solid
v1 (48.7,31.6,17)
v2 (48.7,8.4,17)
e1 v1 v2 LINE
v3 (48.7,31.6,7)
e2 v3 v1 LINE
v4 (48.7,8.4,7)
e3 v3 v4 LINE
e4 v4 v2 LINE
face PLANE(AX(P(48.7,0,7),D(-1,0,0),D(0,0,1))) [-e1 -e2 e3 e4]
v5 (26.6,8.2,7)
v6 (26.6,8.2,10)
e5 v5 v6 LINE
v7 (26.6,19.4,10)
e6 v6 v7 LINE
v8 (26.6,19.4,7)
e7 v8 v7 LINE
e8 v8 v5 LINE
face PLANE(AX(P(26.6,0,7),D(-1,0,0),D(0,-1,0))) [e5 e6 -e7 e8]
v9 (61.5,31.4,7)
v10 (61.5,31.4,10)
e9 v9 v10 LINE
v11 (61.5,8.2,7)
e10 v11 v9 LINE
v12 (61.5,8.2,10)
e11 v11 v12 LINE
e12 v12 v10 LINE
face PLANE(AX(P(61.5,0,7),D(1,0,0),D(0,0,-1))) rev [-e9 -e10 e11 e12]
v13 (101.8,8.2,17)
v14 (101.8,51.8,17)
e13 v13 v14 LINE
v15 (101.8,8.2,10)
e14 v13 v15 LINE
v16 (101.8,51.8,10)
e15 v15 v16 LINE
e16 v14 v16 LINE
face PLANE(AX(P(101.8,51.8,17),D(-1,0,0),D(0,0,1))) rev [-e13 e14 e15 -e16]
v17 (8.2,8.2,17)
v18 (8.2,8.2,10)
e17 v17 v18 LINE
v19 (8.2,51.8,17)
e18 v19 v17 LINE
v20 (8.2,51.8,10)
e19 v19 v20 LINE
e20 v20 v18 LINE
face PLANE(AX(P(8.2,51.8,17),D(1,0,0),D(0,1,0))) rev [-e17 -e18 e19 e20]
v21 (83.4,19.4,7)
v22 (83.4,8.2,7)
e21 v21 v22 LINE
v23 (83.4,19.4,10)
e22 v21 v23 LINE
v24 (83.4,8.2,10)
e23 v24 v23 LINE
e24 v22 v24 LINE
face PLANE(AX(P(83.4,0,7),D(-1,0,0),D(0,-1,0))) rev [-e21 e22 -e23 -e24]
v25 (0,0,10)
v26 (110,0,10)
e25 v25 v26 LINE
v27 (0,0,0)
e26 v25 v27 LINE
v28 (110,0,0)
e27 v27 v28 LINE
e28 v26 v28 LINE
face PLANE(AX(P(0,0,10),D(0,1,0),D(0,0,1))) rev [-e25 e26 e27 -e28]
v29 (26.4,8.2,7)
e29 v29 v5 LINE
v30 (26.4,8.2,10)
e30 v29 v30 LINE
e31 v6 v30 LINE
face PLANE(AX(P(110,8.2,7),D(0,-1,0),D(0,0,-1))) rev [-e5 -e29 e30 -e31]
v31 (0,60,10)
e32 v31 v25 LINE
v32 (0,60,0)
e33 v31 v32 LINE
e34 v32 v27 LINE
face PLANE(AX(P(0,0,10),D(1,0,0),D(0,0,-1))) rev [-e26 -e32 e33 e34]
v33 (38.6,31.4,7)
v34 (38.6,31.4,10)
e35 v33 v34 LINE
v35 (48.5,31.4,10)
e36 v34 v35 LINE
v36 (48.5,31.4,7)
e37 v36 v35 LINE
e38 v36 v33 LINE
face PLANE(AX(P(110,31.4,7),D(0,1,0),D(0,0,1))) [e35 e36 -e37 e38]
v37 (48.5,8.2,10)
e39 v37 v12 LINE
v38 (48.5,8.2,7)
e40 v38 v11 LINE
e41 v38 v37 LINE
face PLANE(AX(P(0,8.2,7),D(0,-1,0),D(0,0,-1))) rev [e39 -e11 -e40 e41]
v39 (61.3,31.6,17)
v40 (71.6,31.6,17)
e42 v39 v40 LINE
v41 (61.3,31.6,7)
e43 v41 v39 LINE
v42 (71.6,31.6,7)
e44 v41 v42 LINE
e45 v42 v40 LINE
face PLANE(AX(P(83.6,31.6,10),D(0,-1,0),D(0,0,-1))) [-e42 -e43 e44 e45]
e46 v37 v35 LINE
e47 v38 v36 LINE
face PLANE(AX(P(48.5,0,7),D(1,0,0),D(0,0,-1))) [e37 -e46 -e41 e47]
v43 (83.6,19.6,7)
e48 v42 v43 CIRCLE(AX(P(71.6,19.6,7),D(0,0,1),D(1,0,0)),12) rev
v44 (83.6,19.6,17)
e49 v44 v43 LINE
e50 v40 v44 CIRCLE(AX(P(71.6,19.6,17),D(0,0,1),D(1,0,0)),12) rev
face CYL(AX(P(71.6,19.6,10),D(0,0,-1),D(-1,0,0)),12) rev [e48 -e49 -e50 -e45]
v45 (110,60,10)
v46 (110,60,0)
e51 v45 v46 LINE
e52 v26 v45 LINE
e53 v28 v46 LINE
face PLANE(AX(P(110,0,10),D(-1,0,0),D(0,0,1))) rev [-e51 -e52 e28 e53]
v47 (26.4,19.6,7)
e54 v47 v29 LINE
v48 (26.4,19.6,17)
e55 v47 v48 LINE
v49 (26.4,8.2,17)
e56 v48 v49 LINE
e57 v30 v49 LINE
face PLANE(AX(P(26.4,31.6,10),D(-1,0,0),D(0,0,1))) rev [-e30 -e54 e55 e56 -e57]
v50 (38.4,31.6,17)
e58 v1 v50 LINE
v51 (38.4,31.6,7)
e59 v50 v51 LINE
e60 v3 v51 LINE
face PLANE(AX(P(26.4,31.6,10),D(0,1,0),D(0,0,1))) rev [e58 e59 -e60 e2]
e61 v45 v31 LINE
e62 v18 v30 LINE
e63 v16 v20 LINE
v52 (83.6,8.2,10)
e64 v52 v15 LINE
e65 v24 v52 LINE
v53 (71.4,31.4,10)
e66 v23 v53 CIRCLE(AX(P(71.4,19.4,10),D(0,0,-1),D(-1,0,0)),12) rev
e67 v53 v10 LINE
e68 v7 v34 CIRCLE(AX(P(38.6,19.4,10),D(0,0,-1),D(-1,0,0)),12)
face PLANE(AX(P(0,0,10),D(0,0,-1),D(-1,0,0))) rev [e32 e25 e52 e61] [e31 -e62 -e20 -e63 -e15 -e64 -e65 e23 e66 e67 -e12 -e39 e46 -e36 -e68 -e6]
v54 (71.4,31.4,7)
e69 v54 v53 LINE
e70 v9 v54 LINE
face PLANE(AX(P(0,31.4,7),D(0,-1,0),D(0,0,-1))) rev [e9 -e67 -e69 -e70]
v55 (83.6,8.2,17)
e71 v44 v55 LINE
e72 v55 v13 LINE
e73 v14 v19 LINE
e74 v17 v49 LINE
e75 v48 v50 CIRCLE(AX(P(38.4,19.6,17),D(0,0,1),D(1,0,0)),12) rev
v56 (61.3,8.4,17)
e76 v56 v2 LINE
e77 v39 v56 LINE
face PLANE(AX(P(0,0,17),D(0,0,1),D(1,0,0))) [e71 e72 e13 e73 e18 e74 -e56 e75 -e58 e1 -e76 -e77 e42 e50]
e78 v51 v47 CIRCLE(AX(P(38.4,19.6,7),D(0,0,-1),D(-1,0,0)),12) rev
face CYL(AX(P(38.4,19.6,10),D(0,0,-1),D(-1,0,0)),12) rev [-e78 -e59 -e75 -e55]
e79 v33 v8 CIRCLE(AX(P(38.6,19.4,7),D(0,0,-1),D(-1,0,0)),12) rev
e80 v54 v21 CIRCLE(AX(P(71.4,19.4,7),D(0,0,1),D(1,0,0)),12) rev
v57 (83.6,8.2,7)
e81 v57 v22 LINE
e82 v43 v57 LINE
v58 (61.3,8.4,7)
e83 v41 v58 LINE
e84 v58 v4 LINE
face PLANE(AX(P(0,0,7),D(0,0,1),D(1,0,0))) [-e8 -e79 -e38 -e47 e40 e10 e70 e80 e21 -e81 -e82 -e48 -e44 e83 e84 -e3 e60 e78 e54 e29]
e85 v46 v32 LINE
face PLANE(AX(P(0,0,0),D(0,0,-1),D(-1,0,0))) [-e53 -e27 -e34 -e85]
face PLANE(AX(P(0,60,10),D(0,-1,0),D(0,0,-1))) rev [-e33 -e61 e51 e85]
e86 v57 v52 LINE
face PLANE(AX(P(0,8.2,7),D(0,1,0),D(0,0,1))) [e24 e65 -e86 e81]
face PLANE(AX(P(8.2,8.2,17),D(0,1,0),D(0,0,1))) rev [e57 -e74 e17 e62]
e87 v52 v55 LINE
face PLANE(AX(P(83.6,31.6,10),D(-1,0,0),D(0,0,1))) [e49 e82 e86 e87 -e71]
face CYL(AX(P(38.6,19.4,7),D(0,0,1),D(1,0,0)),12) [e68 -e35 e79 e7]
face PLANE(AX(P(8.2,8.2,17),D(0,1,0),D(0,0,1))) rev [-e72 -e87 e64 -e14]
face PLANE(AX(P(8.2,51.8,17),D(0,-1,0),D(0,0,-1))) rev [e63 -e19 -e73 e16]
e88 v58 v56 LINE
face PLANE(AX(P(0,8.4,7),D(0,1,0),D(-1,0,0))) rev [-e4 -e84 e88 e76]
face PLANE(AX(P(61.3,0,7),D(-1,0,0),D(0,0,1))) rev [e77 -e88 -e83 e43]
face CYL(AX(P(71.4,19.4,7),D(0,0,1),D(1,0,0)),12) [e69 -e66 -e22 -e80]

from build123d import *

# Parameters (mm, degrees)
SKETCH1_W            = 110
SKETCH1_H            = 60
BOSS_EXTRUDE1_DEPTH  = 10
SKETCH2_W            = 93.6
SKETCH2_H            = 43.6
BOSS_EXTRUDE3_DEPTH  = 7
SKETCH3_W            = 22.1
SKETCH3_H            = 23.4
CUT_EXTRUDE1_DEPTH   = 7
FILLET1_R            = 12
FILLET1_OF_MIRROR1_R = 12
CUT_EXTRUDE3_START   = -10
CUT_EXTRUDE3_DEPTH   = 10


# Read off the part's stored shape, not the designer's step: Cut-Extrude3
with BuildPart() as part:
    # Sketch1 → Boss-Extrude1 (new body)
    with BuildSketch(Plane.XY):
        with Locations((55, 30)):
            Rectangle(SKETCH1_W, SKETCH1_H)
    extrude(amount=BOSS_EXTRUDE1_DEPTH)

    # Sketch2 → Boss-Extrude3 (add)
    with BuildSketch(Plane.XY.offset(10)):
        with Locations((55, 30)):
            Rectangle(SKETCH2_W, SKETCH2_H)
    extrude(amount=BOSS_EXTRUDE3_DEPTH)

    # Sketch3 → Cut-Extrude1 (cut)
    with BuildSketch(Plane.XY.offset(17)):
        with Locations((37.45, 19.9)):
            Rectangle(SKETCH3_W, SKETCH3_H)
    cut_extrude1 = extrude(amount=-CUT_EXTRUDE1_DEPTH, mode=Mode.SUBTRACT)

    # Fillet1
    fillet1_edges = [part.edges().sort_by_distance(p)[0] for p in [
        (26.4, 31.6, 13.5),
    ]]
    fillet(fillet1_edges, radius=FILLET1_R)

    # Mirror1: Cut-Extrude1 across plane
    add(cut_extrude1.mirror(Plane(origin=(55, 0, 0), x_dir=(0, 0, 1), z_dir=(1, 0, 0))), mode=Mode.SUBTRACT)

    # Fillet1 of Mirror1
    fillet1_of_mirror1_edges = [part.edges().sort_by_distance(p)[0] for p in [
        (83.6, 31.6, 13.5),
    ]]
    fillet(fillet1_of_mirror1_edges, radius=FILLET1_OF_MIRROR1_R)

    # Cut-Extrude3 outline → Cut-Extrude3 (cut)
    with BuildSketch(Plane.XY.offset(17).offset(CUT_EXTRUDE3_START)):
        with BuildLine():
            Line((61.3, 31.6), (61.3, 8.4))
            Line((61.3, 8.4), (55, 8.4))
            Line((55, 8.4), (55, 8.2))
            Line((55, 8.2), (61.5, 8.2))
            Line((61.5, 8.2), (61.5, 31.4))
            Line((61.5, 31.4), (71.4, 31.4))
            ThreePointArc((71.4, 31.4), (79.885281374, 27.885281374), (83.4, 19.4))
            Line((83.4, 19.4), (83.4, 8.2))
            Line((83.4, 8.2), (83.6, 8.2))
            Line((83.6, 8.2), (83.6, 19.6))
            ThreePointArc((83.6, 19.6), (80.085281374, 28.085281374), (71.6, 31.6))
            Line((71.6, 31.6), (61.3, 31.6))
        make_face()
    cut_extrude3 = extrude(amount=CUT_EXTRUDE3_DEPTH, mode=Mode.SUBTRACT)

    # Mirror2: Cut-Extrude3 across plane
    add(cut_extrude3.mirror(Plane(origin=(55, 0, 0), x_dir=(0, 0, 1), z_dir=(1, 0, 0))), mode=Mode.SUBTRACT)


solid = part.part
